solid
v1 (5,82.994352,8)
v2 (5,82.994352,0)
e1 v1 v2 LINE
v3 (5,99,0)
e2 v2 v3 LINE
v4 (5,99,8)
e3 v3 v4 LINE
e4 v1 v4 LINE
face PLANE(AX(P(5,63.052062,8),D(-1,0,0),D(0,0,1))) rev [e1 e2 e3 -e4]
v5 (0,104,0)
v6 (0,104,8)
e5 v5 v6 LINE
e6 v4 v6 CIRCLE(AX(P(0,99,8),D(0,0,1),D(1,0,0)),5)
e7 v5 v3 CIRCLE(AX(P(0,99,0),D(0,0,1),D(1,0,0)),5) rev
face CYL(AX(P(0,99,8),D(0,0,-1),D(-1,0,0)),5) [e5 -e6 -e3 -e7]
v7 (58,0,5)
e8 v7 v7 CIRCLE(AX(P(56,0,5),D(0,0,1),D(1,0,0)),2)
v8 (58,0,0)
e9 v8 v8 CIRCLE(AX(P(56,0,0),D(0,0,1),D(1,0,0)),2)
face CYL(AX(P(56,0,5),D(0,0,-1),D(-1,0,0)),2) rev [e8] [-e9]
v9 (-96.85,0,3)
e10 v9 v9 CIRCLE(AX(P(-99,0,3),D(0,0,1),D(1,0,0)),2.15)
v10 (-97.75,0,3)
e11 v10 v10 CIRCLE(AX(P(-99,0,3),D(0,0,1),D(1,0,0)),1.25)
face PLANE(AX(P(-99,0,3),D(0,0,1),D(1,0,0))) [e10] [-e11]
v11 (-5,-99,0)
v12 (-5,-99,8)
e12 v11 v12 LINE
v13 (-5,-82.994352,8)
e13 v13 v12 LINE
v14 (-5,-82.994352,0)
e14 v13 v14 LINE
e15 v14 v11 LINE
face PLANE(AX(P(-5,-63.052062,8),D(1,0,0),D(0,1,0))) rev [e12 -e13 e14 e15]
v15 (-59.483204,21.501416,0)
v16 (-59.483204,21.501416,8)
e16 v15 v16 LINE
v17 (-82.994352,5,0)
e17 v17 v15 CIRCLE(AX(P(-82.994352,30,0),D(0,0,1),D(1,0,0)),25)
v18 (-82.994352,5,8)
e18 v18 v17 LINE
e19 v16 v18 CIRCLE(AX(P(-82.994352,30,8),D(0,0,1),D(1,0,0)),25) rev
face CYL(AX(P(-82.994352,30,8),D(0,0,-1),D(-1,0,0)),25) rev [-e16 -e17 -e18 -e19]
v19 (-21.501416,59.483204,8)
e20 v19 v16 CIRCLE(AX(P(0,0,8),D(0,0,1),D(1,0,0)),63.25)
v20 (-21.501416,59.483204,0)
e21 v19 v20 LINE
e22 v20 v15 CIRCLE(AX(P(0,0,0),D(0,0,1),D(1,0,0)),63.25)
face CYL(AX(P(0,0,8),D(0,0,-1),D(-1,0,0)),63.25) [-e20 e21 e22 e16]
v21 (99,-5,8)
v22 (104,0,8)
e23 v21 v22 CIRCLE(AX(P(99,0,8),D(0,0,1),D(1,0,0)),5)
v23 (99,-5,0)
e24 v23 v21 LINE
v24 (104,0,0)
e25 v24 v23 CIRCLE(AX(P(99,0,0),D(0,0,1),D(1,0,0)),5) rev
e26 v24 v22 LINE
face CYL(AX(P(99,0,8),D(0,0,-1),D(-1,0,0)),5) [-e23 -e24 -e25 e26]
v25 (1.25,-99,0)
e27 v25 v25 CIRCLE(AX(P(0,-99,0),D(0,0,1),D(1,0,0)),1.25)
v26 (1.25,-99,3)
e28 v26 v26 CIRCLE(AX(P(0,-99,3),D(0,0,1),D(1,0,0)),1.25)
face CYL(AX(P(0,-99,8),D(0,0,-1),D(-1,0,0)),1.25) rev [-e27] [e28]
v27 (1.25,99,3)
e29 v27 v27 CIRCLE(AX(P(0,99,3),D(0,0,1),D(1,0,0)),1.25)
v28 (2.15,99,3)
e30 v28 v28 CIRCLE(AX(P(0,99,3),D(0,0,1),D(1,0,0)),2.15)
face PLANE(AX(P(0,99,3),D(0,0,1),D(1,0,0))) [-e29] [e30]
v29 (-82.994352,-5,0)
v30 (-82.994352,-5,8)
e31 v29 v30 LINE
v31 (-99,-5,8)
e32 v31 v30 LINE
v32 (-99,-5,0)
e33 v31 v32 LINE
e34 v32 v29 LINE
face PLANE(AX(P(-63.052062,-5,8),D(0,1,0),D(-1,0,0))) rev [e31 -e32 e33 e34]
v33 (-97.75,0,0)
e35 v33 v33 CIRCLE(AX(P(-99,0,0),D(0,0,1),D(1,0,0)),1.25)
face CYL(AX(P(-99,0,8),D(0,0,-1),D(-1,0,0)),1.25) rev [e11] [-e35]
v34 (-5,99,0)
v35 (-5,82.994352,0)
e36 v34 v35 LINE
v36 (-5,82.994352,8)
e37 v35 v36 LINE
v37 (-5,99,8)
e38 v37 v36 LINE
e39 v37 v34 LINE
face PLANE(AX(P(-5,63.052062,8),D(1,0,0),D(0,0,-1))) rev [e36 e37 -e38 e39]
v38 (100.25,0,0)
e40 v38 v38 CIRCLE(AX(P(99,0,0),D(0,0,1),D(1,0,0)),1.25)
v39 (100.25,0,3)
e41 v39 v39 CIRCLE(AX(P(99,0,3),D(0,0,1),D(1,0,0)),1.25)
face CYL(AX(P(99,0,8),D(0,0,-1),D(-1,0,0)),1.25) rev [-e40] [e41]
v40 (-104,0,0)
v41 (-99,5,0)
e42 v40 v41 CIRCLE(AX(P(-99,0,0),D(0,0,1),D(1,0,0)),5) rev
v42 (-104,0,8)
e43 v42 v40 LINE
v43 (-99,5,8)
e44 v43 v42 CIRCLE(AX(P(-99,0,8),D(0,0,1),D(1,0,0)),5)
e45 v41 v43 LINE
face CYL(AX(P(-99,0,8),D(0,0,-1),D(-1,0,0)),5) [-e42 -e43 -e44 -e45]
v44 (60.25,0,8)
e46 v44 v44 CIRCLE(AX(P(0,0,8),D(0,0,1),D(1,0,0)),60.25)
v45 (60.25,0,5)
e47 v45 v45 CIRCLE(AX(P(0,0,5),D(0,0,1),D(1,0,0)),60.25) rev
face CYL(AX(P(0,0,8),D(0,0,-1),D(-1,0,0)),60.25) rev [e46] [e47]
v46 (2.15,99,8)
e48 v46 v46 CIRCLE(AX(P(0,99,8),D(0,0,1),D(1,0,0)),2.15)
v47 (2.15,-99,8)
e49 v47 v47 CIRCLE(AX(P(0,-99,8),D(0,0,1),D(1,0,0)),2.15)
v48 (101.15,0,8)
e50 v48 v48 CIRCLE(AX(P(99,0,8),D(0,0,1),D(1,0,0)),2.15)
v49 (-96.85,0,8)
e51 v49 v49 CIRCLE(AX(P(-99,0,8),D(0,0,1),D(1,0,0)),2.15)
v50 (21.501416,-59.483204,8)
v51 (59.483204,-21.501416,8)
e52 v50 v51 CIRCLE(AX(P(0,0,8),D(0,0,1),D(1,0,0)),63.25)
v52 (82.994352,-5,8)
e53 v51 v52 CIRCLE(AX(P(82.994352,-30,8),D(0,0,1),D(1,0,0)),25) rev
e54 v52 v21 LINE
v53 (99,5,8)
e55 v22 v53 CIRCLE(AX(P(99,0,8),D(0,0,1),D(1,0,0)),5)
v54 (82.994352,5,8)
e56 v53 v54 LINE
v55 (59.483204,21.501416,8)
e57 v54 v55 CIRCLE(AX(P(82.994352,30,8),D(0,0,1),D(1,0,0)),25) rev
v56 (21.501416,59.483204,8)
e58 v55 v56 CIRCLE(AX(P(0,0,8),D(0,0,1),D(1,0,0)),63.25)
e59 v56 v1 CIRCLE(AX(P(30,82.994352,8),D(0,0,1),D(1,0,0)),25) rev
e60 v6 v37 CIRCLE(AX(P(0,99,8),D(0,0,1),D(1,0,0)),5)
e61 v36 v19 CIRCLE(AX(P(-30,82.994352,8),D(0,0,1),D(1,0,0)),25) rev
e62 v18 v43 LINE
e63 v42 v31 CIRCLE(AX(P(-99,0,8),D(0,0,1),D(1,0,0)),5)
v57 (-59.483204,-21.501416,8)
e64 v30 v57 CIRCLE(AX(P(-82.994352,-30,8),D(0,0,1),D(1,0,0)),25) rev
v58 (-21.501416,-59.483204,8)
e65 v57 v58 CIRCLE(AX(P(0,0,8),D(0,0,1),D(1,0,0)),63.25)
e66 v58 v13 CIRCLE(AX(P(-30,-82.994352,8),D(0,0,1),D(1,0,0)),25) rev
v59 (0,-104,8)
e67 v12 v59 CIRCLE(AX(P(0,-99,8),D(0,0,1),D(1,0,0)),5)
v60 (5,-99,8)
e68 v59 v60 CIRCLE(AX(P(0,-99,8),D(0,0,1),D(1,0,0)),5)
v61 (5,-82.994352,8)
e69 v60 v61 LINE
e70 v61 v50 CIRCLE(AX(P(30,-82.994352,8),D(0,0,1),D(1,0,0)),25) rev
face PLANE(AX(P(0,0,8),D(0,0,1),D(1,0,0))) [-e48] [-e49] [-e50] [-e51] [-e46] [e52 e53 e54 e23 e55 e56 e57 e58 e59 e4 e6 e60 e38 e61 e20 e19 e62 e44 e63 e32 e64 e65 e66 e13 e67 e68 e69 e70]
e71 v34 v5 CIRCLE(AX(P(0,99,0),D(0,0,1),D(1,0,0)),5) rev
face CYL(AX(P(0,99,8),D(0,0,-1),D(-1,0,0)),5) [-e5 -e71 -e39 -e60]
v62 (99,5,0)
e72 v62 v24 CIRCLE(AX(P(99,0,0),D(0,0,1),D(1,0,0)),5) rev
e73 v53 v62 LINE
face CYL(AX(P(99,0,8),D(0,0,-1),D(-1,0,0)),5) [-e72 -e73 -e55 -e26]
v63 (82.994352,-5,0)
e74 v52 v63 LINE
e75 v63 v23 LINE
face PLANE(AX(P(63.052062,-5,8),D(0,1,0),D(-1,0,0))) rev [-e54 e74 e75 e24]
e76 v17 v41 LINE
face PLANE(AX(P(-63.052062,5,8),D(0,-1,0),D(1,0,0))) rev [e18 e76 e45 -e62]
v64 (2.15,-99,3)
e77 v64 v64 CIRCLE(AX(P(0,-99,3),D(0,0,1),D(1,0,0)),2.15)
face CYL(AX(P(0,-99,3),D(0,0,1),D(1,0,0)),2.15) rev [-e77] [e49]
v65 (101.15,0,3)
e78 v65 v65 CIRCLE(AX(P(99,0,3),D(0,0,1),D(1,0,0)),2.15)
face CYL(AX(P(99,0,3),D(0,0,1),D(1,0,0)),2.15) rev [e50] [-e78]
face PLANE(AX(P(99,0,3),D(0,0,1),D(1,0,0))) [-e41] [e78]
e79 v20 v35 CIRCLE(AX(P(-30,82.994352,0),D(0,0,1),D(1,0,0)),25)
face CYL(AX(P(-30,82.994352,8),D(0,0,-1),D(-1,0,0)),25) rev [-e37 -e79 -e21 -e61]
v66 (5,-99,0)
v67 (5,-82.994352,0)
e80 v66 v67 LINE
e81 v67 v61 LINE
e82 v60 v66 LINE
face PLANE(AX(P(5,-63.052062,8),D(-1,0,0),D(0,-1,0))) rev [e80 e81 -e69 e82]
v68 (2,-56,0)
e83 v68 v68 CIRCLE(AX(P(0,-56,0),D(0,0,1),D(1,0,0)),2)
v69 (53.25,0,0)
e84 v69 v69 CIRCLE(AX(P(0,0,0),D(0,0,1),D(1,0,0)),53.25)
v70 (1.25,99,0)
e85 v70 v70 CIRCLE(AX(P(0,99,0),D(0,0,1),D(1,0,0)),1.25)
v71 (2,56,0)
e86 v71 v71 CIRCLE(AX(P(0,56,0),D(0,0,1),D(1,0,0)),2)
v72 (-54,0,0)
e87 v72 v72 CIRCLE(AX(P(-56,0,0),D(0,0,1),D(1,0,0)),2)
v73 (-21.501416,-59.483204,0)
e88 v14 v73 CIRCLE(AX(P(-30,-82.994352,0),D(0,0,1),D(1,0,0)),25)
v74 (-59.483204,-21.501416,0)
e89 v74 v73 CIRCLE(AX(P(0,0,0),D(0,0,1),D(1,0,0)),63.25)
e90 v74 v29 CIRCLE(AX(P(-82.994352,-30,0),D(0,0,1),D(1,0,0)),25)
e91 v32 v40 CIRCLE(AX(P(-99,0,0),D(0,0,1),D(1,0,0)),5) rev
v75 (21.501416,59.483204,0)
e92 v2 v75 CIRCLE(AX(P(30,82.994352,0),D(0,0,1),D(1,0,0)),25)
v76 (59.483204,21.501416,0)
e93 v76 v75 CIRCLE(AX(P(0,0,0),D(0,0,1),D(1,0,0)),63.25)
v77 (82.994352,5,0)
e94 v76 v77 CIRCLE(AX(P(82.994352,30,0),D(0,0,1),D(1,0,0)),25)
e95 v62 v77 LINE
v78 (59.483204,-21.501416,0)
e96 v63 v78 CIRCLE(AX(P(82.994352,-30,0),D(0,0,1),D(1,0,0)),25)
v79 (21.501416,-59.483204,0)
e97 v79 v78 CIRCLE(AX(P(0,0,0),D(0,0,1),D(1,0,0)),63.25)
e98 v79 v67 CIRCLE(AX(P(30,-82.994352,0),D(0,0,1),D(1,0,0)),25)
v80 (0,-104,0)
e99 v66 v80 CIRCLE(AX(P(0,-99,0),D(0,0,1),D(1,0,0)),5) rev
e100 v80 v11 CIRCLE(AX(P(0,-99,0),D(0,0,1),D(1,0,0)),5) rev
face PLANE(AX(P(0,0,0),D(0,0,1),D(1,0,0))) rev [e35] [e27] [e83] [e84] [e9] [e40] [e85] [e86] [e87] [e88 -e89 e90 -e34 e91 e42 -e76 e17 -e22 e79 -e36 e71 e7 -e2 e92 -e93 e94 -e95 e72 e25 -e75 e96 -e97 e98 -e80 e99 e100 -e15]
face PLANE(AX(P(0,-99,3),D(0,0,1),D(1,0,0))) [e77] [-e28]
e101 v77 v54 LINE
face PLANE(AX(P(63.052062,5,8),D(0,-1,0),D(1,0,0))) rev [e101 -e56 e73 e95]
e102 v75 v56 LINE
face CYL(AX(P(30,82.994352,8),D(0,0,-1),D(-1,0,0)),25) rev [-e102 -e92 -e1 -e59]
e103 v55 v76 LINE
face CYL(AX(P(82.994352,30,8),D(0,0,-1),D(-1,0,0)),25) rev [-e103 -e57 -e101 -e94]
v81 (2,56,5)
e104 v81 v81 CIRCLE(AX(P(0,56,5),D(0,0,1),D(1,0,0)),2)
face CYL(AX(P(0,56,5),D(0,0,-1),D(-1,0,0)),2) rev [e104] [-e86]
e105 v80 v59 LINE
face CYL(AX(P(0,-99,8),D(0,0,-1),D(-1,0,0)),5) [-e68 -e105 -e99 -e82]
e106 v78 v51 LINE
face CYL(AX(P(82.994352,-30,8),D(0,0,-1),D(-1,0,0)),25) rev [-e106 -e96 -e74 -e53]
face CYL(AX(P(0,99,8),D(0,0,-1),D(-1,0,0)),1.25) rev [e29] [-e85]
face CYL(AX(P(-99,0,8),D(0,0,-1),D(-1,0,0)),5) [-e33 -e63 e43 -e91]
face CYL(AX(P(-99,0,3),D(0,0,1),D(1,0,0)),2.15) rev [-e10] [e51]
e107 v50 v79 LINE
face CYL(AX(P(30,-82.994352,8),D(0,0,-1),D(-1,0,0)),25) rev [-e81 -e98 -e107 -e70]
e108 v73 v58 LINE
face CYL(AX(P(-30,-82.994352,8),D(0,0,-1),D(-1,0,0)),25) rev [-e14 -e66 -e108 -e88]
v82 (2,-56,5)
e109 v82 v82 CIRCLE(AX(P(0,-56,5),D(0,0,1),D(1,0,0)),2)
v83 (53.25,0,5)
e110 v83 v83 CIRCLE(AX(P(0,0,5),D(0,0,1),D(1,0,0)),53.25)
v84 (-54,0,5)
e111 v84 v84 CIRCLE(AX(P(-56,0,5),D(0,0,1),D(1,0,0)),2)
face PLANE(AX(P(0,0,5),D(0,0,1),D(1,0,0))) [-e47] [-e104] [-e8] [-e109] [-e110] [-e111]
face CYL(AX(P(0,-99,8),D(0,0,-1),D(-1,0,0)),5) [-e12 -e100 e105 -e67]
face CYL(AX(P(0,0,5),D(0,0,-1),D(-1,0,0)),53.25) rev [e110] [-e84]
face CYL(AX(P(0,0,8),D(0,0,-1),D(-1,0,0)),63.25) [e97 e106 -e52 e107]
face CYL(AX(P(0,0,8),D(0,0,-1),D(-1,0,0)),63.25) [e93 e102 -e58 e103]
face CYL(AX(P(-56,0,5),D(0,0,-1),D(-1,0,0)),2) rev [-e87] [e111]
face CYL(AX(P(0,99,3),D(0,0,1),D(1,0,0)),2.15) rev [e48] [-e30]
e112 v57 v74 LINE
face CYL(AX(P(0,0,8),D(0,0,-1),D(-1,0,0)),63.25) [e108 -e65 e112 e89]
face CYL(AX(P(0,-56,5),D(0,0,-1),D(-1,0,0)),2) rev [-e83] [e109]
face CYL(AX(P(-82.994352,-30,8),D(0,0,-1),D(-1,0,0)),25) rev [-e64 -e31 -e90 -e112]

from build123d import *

# Parameters (mm, degrees)
CROQUIS1_R              = 60.25
CROQUIS1_R_2            = 2
CROQUIS1_R_3            = 53.25
SALIENTE_EXTRUIR1_DEPTH = 5
CROQUIS1_2_R            = 63.25
CROQUIS1_2_R_2          = 60.25
EXTRUIR_L_MINA1_DEPTH   = 8
CROQUIS2_W              = 10
CROQUIS2_H              = 40.947938178
CROQUIS2_R              = 1.25
CROQUIS2_W_2            = 40.947938178
CROQUIS2_H_2            = 10
SALIENTE_EXTRUIR2_DEPTH = 8
REDONDEO1_R             = 25
CROQUIS3_R              = 2.15
CORTAR_EXTRUIR1_DEPTH   = 5
REDONDEO2_R             = 5


with BuildPart() as part:
    # Croquis1 → Saliente-Extruir1 (new body)
    with BuildSketch(Plane.XY):
        Circle(CROQUIS1_R)
        with Locations((0, 56)):
            Circle(CROQUIS1_R_2, mode=Mode.SUBTRACT)
        Circle(CROQUIS1_R_3, mode=Mode.SUBTRACT)
        with Locations((56, 0)):
            Circle(CROQUIS1_R_2, mode=Mode.SUBTRACT)
        with Locations((0, -56)):
            Circle(CROQUIS1_R_2, mode=Mode.SUBTRACT)
        with Locations((-56, 0)):
            Circle(CROQUIS1_R_2, mode=Mode.SUBTRACT)
    extrude(amount=SALIENTE_EXTRUIR1_DEPTH)

    # Croquis1<2> → Extruir-Lámina1 (add)
    with BuildSketch(Plane.XY):
        Circle(CROQUIS1_2_R)
        Circle(CROQUIS1_2_R_2, mode=Mode.SUBTRACT)
    extrude(amount=EXTRUIR_L_MINA1_DEPTH)

    # Croquis2 → Saliente-Extruir2 (add)
    # profile 1 of 4: a face of its own
    with BuildSketch(Plane.XY):
        with Locations((0, 83.526030911)):
            Rectangle(CROQUIS2_W, CROQUIS2_H)
        with Locations((0, 99)):
            Circle(CROQUIS2_R, mode=Mode.SUBTRACT)
    # profile 2 of 4: a face of its own
    with BuildSketch(Plane.XY):
        with Locations((83.526030911, 0)):
            Rectangle(CROQUIS2_W_2, CROQUIS2_H_2)
        with Locations((99, 0)):
            Circle(CROQUIS2_R, mode=Mode.SUBTRACT)
    # profile 3 of 4: a face of its own
    with BuildSketch(Plane.XY):
        with Locations((0, -83.526030911)):
            Rectangle(CROQUIS2_W, CROQUIS2_H)
        with Locations((0, -99)):
            Circle(CROQUIS2_R, mode=Mode.SUBTRACT)
    # profile 4 of 4: a face of its own
    with BuildSketch(Plane.XY):
        with Locations((-83.526030911, 0)):
            Rectangle(CROQUIS2_W_2, CROQUIS2_H_2)
        with Locations((-99, 0)):
            Circle(CROQUIS2_R, mode=Mode.SUBTRACT)
    extrude(amount=SALIENTE_EXTRUIR2_DEPTH)

    # Redondeo1
    redondeo1_edges = [part.edges().sort_by_distance(p)[0] for p in [
        (-5, 63.052061822, 4),
        (5, 63.052061822, 4),
        (63.052061822, 5, 4),
        (63.052061822, -5, 4),
        (5, -63.052061822, 4),
        (-5, -63.052061822, 4),
        (-63.052061822, -5, 4),
        (-63.052061822, 5, 4),
    ]]
    fillet(redondeo1_edges, radius=REDONDEO1_R)

    # Croquis3 → Cortar-Extruir1 (cut)
    with BuildSketch(Plane.XY.offset(8)):
        with Locations((0, 99)):
            Circle(CROQUIS3_R)
        with Locations((99, 0)):
            Circle(CROQUIS3_R)
        with Locations((0, -99)):
            Circle(CROQUIS3_R)
        with Locations((-99, 0)):
            Circle(CROQUIS3_R)
    extrude(amount=-CORTAR_EXTRUIR1_DEPTH, mode=Mode.SUBTRACT)

    # Redondeo2
    redondeo2_edges = [part.edges().sort_by_distance(p)[0] for p in [
        (-104, -5, 4),
        (-104, 5, 4),
        (-5, -104, 4),
        (5, -104, 4),
        (104, -5, 4),
        (104, 5, 4),
        (5, 104, 4),
        (-5, 104, 4),
    ]]
    fillet(redondeo2_edges, radius=REDONDEO2_R - 0.0001)  # a hair under: the kernel refuses the full size


solid = part.part
